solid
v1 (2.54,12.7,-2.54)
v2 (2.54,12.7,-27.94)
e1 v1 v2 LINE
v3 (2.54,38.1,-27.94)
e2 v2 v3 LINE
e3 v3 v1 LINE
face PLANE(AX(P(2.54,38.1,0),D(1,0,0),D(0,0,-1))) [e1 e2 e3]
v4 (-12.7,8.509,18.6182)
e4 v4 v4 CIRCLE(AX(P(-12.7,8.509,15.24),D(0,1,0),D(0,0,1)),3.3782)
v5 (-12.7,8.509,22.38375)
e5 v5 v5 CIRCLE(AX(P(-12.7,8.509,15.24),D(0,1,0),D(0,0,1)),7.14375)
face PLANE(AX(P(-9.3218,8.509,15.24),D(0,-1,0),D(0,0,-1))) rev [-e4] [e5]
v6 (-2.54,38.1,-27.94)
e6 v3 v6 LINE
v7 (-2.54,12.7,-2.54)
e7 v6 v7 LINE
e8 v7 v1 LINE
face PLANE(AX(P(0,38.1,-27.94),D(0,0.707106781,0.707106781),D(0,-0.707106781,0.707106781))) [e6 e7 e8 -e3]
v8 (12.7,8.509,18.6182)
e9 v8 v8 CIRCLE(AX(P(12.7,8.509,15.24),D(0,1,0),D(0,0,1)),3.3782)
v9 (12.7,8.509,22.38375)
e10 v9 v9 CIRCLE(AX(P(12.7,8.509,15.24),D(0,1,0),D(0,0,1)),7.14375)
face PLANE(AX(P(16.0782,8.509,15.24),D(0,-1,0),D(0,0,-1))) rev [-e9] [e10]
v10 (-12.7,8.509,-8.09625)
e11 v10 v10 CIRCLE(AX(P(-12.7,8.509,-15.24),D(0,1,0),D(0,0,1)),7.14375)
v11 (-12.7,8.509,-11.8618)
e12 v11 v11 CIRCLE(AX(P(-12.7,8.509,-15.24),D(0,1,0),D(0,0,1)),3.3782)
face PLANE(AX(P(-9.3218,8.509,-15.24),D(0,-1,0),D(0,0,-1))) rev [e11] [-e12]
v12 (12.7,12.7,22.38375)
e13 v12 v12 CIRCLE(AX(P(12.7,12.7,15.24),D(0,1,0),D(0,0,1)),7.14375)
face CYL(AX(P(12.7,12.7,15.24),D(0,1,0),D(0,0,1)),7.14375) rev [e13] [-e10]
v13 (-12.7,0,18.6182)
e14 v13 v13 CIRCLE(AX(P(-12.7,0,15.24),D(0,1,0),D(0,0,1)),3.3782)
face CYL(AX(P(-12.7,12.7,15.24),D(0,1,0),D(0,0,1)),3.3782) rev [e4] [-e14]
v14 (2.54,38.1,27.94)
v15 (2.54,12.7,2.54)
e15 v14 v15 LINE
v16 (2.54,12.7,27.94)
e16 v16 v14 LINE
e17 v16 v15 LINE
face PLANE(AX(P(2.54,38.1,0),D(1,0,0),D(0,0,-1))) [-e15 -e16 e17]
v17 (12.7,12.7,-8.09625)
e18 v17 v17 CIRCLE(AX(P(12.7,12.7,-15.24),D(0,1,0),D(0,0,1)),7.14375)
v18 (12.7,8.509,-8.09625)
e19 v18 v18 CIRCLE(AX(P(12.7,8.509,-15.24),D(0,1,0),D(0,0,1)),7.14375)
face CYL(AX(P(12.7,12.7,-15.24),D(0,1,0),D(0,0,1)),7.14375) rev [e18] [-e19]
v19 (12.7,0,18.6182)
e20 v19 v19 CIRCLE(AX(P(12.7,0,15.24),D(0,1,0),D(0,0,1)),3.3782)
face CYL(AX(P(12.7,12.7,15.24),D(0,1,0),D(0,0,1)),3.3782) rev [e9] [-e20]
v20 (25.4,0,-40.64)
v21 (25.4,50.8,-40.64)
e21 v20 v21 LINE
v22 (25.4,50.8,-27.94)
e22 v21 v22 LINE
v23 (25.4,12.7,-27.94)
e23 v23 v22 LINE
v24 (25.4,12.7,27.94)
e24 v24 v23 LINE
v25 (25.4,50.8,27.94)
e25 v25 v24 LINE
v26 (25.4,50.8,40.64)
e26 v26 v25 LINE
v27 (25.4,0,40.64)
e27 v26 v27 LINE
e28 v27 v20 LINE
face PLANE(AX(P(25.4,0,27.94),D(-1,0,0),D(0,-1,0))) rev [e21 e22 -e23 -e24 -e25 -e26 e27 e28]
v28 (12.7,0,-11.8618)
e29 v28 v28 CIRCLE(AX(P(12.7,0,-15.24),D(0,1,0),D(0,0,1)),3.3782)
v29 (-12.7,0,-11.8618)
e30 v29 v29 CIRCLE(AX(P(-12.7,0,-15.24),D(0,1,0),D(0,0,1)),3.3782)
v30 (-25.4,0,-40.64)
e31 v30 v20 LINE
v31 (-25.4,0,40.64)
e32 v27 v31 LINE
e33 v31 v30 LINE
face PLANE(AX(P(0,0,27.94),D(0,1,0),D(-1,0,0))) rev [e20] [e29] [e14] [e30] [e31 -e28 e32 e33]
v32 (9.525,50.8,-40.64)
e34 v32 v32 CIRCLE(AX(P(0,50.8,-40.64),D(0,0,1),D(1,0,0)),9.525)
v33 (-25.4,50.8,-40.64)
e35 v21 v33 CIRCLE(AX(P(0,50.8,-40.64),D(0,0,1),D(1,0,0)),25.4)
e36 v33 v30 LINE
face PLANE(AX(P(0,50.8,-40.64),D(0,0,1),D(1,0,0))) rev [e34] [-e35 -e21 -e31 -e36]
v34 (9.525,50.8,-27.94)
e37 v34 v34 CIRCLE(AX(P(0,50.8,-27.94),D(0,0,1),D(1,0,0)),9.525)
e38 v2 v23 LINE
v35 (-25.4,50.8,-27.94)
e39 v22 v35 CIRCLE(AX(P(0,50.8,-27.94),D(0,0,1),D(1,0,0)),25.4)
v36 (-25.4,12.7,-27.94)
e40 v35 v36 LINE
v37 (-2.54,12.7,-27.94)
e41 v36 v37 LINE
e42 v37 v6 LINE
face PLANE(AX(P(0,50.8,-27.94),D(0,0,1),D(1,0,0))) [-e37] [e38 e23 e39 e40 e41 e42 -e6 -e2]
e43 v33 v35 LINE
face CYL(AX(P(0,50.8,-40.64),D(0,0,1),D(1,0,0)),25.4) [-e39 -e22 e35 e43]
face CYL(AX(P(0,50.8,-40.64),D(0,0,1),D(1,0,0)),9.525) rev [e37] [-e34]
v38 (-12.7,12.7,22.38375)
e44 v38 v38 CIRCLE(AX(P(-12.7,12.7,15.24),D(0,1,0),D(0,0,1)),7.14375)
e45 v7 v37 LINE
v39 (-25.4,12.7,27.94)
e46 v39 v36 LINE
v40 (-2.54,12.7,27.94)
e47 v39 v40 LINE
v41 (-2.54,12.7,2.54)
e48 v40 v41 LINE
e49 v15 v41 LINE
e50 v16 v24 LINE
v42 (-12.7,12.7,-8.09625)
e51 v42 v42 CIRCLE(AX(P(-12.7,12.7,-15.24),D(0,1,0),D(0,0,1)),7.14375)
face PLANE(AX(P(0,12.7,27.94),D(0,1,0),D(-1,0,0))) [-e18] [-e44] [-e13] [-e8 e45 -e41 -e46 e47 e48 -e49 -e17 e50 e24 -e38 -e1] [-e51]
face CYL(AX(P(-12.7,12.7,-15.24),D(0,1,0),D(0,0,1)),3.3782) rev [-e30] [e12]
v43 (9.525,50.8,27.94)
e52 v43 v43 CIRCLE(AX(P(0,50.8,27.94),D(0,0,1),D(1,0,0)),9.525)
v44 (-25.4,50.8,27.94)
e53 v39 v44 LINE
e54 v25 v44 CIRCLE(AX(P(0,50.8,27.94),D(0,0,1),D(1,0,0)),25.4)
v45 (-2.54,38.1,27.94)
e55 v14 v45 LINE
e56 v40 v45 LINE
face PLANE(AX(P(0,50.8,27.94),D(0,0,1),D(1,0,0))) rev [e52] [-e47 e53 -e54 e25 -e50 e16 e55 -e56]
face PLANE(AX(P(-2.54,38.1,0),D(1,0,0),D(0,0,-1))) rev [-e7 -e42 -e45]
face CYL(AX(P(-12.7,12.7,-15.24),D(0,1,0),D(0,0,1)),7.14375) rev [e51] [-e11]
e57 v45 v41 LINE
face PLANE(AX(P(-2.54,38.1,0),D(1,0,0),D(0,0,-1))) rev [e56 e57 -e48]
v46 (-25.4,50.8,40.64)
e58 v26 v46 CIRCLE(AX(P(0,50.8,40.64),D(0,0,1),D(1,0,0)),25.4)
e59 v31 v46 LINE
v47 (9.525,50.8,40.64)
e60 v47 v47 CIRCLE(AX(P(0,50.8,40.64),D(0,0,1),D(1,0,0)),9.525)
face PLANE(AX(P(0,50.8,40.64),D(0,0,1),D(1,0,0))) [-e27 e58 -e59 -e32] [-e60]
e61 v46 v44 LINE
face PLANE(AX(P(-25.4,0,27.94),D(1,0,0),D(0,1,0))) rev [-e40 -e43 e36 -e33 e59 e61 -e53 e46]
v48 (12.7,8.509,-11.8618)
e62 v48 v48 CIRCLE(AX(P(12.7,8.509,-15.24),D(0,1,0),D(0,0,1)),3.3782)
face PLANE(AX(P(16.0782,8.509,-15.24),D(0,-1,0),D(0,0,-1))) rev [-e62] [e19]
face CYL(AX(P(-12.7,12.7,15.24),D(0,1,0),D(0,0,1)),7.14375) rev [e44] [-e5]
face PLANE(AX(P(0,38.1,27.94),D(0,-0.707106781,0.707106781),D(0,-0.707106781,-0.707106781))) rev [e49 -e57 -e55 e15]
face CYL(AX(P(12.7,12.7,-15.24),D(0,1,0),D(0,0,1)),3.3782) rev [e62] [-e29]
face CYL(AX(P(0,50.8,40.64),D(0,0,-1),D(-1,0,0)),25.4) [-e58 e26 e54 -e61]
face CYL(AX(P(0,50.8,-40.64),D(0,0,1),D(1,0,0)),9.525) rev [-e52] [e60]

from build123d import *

# Parameters (mm, degrees)
SKETCH1_W                                      = 50.8
SKETCH1_H                                      = 12.7
BOSS_EXTRUDE1_DEPTH                            = 27.94
BOSS_EXTRUDE2_START                            = 27.94
SKETCH1_3_W                                    = 50.8
SKETCH1_3_H                                    = 12.7
BOSS_EXTRUDE2_DEPTH                            = 12.7
BOSS_EXTRUDE3_START                            = -40.64
SKETCH1_4_W                                    = 50.8
SKETCH1_4_H                                    = 12.7
BOSS_EXTRUDE3_DEPTH                            = 12.7
SKETCH2_R                                      = 9.525
CUT_EXTRUDE1_DEPTH                             = 115.271774293
RIB6_REACH                                     = 92.018
SKETCH4_WALL_W                                 = 217.956683174
SKETCH4_WALL_H                                 = 5.08
CBORE_START                                    = 8.509
CBORE_FOR_1_4_BINDING_HEAD_MACHINE_S_2_R       = 7.14375
CBORE_FOR_1_4_BINDING_HEAD_MACHINE_SCREW_DEPTH = 4.191
CBORE_FOR_1_4_BINDING_HEAD_MACHINE_S_3_O_R     = 3.3782
CBORE_FOR_1_4_BINDING_HEAD_MACHINE_S_3_DEPTH   = 8.509


# Read off the part's stored shape, not the designer's step: CBORE for 1/4 Binding Head Machine Screw1
with BuildPart() as part:
    # Sketch1 → Boss-Extrude1 (new, symmetric)
    with BuildSketch(Plane.XY):
        with Locations((0, 6.35)):
            Rectangle(SKETCH1_W, SKETCH1_H)
    extrude(amount=BOSS_EXTRUDE1_DEPTH, both=True)

    # Sketch1<3> → Boss-Extrude2 (add)
    with BuildSketch(Plane.XY.offset(BOSS_EXTRUDE2_START)):
        with BuildLine():
            Line((-25.4, 50.8), (-25.4, 12.7))
            Line((-25.4, 12.7), (25.4, 12.7))
            Line((25.4, 12.7), (25.4, 50.8))
            ThreePointArc((25.4, 50.8), (0, 76.2), (-25.4, 50.8))
        make_face()
        with Locations((0, 6.35)):
            Rectangle(SKETCH1_3_W, SKETCH1_3_H)
    extrude(amount=BOSS_EXTRUDE2_DEPTH)

    # Sketch1<4> → Boss-Extrude3 (add)
    with BuildSketch(Plane.XY.offset(BOSS_EXTRUDE3_START)):
        with BuildLine():
            Line((-25.4, 50.8), (-25.4, 12.7))
            Line((-25.4, 12.7), (25.4, 12.7))
            Line((25.4, 12.7), (25.4, 50.8))
            ThreePointArc((25.4, 50.8), (0, 76.2), (-25.4, 50.8))
        make_face()
        with Locations((0, 6.35)):
            Rectangle(SKETCH1_4_W, SKETCH1_4_H)
    extrude(amount=BOSS_EXTRUDE3_DEPTH)

    # Sketch2 → Cut-Extrude1 (cut, through all)
    with BuildSketch(Plane.XY.offset(40.64)):
        with Locations((0, 50.8)):
            Circle(SKETCH2_R)
    extrude(amount=-CUT_EXTRUDE1_DEPTH, mode=Mode.SUBTRACT)

    # Sketch4 wall → Rib6 (add, up to next)
    with BuildSketch(Plane(origin=(0, 25.4, 15.24), x_dir=(0, -0.707106781187, -0.707106781187), z_dir=(0, 0.707106781187, -0.707106781187)), mode=Mode.PRIVATE) as rib6_sk1:
        Rectangle(SKETCH4_WALL_W, SKETCH4_WALL_H)
    rib6_tool1 = extrude(rib6_sk1.sketch, amount=-RIB6_REACH, mode=Mode.PRIVATE) - part.part
    rib6 = rib6_tool1.solids().sort_by_distance((0, 25.4, 15.24))[0]
    add(rib6)

    # Mirror1: Rib6 across plane
    add(rib6.mirror(Plane.XY))

    # CBORE for 1_4 Binding Head Machine S 2 → CBORE for 1/4 Binding Head Machine Screw1 (cut)
    with BuildSketch(Plane(origin=(0, 0, 0), x_dir=(1, 0, 0), z_dir=(0, 1, 0)).offset(CBORE_START)):
        with Locations((12.7, -15.24)):
            Circle(CBORE_FOR_1_4_BINDING_HEAD_MACHINE_S_2_R)
        with Locations((12.7, 15.24)):
            Circle(CBORE_FOR_1_4_BINDING_HEAD_MACHINE_S_2_R)
        with Locations((-12.7, -15.24)):
            Circle(CBORE_FOR_1_4_BINDING_HEAD_MACHINE_S_2_R)
        with Locations((-12.7, 15.24)):
            Circle(CBORE_FOR_1_4_BINDING_HEAD_MACHINE_S_2_R)
    extrude(amount=CBORE_FOR_1_4_BINDING_HEAD_MACHINE_SCREW_DEPTH, mode=Mode.SUBTRACT)

    # CBORE for 1_4 Binding Head Machine S 3 o → CBORE for 1_4 Binding Head Machine S 3 (cut)
    with BuildSketch(Plane(origin=(0, 0, 0), x_dir=(1, 0, 0), z_dir=(0, 1, 0))):
        with Locations((12.7, -15.24)):
            Circle(CBORE_FOR_1_4_BINDING_HEAD_MACHINE_S_3_O_R)
        with Locations((12.7, 15.24)):
            Circle(CBORE_FOR_1_4_BINDING_HEAD_MACHINE_S_3_O_R)
        with Locations((-12.7, -15.24)):
            Circle(CBORE_FOR_1_4_BINDING_HEAD_MACHINE_S_3_O_R)
        with Locations((-12.7, 15.24)):
            Circle(CBORE_FOR_1_4_BINDING_HEAD_MACHINE_S_3_O_R)
    extrude(amount=CBORE_FOR_1_4_BINDING_HEAD_MACHINE_S_3_DEPTH, mode=Mode.SUBTRACT)


solid = part.part
